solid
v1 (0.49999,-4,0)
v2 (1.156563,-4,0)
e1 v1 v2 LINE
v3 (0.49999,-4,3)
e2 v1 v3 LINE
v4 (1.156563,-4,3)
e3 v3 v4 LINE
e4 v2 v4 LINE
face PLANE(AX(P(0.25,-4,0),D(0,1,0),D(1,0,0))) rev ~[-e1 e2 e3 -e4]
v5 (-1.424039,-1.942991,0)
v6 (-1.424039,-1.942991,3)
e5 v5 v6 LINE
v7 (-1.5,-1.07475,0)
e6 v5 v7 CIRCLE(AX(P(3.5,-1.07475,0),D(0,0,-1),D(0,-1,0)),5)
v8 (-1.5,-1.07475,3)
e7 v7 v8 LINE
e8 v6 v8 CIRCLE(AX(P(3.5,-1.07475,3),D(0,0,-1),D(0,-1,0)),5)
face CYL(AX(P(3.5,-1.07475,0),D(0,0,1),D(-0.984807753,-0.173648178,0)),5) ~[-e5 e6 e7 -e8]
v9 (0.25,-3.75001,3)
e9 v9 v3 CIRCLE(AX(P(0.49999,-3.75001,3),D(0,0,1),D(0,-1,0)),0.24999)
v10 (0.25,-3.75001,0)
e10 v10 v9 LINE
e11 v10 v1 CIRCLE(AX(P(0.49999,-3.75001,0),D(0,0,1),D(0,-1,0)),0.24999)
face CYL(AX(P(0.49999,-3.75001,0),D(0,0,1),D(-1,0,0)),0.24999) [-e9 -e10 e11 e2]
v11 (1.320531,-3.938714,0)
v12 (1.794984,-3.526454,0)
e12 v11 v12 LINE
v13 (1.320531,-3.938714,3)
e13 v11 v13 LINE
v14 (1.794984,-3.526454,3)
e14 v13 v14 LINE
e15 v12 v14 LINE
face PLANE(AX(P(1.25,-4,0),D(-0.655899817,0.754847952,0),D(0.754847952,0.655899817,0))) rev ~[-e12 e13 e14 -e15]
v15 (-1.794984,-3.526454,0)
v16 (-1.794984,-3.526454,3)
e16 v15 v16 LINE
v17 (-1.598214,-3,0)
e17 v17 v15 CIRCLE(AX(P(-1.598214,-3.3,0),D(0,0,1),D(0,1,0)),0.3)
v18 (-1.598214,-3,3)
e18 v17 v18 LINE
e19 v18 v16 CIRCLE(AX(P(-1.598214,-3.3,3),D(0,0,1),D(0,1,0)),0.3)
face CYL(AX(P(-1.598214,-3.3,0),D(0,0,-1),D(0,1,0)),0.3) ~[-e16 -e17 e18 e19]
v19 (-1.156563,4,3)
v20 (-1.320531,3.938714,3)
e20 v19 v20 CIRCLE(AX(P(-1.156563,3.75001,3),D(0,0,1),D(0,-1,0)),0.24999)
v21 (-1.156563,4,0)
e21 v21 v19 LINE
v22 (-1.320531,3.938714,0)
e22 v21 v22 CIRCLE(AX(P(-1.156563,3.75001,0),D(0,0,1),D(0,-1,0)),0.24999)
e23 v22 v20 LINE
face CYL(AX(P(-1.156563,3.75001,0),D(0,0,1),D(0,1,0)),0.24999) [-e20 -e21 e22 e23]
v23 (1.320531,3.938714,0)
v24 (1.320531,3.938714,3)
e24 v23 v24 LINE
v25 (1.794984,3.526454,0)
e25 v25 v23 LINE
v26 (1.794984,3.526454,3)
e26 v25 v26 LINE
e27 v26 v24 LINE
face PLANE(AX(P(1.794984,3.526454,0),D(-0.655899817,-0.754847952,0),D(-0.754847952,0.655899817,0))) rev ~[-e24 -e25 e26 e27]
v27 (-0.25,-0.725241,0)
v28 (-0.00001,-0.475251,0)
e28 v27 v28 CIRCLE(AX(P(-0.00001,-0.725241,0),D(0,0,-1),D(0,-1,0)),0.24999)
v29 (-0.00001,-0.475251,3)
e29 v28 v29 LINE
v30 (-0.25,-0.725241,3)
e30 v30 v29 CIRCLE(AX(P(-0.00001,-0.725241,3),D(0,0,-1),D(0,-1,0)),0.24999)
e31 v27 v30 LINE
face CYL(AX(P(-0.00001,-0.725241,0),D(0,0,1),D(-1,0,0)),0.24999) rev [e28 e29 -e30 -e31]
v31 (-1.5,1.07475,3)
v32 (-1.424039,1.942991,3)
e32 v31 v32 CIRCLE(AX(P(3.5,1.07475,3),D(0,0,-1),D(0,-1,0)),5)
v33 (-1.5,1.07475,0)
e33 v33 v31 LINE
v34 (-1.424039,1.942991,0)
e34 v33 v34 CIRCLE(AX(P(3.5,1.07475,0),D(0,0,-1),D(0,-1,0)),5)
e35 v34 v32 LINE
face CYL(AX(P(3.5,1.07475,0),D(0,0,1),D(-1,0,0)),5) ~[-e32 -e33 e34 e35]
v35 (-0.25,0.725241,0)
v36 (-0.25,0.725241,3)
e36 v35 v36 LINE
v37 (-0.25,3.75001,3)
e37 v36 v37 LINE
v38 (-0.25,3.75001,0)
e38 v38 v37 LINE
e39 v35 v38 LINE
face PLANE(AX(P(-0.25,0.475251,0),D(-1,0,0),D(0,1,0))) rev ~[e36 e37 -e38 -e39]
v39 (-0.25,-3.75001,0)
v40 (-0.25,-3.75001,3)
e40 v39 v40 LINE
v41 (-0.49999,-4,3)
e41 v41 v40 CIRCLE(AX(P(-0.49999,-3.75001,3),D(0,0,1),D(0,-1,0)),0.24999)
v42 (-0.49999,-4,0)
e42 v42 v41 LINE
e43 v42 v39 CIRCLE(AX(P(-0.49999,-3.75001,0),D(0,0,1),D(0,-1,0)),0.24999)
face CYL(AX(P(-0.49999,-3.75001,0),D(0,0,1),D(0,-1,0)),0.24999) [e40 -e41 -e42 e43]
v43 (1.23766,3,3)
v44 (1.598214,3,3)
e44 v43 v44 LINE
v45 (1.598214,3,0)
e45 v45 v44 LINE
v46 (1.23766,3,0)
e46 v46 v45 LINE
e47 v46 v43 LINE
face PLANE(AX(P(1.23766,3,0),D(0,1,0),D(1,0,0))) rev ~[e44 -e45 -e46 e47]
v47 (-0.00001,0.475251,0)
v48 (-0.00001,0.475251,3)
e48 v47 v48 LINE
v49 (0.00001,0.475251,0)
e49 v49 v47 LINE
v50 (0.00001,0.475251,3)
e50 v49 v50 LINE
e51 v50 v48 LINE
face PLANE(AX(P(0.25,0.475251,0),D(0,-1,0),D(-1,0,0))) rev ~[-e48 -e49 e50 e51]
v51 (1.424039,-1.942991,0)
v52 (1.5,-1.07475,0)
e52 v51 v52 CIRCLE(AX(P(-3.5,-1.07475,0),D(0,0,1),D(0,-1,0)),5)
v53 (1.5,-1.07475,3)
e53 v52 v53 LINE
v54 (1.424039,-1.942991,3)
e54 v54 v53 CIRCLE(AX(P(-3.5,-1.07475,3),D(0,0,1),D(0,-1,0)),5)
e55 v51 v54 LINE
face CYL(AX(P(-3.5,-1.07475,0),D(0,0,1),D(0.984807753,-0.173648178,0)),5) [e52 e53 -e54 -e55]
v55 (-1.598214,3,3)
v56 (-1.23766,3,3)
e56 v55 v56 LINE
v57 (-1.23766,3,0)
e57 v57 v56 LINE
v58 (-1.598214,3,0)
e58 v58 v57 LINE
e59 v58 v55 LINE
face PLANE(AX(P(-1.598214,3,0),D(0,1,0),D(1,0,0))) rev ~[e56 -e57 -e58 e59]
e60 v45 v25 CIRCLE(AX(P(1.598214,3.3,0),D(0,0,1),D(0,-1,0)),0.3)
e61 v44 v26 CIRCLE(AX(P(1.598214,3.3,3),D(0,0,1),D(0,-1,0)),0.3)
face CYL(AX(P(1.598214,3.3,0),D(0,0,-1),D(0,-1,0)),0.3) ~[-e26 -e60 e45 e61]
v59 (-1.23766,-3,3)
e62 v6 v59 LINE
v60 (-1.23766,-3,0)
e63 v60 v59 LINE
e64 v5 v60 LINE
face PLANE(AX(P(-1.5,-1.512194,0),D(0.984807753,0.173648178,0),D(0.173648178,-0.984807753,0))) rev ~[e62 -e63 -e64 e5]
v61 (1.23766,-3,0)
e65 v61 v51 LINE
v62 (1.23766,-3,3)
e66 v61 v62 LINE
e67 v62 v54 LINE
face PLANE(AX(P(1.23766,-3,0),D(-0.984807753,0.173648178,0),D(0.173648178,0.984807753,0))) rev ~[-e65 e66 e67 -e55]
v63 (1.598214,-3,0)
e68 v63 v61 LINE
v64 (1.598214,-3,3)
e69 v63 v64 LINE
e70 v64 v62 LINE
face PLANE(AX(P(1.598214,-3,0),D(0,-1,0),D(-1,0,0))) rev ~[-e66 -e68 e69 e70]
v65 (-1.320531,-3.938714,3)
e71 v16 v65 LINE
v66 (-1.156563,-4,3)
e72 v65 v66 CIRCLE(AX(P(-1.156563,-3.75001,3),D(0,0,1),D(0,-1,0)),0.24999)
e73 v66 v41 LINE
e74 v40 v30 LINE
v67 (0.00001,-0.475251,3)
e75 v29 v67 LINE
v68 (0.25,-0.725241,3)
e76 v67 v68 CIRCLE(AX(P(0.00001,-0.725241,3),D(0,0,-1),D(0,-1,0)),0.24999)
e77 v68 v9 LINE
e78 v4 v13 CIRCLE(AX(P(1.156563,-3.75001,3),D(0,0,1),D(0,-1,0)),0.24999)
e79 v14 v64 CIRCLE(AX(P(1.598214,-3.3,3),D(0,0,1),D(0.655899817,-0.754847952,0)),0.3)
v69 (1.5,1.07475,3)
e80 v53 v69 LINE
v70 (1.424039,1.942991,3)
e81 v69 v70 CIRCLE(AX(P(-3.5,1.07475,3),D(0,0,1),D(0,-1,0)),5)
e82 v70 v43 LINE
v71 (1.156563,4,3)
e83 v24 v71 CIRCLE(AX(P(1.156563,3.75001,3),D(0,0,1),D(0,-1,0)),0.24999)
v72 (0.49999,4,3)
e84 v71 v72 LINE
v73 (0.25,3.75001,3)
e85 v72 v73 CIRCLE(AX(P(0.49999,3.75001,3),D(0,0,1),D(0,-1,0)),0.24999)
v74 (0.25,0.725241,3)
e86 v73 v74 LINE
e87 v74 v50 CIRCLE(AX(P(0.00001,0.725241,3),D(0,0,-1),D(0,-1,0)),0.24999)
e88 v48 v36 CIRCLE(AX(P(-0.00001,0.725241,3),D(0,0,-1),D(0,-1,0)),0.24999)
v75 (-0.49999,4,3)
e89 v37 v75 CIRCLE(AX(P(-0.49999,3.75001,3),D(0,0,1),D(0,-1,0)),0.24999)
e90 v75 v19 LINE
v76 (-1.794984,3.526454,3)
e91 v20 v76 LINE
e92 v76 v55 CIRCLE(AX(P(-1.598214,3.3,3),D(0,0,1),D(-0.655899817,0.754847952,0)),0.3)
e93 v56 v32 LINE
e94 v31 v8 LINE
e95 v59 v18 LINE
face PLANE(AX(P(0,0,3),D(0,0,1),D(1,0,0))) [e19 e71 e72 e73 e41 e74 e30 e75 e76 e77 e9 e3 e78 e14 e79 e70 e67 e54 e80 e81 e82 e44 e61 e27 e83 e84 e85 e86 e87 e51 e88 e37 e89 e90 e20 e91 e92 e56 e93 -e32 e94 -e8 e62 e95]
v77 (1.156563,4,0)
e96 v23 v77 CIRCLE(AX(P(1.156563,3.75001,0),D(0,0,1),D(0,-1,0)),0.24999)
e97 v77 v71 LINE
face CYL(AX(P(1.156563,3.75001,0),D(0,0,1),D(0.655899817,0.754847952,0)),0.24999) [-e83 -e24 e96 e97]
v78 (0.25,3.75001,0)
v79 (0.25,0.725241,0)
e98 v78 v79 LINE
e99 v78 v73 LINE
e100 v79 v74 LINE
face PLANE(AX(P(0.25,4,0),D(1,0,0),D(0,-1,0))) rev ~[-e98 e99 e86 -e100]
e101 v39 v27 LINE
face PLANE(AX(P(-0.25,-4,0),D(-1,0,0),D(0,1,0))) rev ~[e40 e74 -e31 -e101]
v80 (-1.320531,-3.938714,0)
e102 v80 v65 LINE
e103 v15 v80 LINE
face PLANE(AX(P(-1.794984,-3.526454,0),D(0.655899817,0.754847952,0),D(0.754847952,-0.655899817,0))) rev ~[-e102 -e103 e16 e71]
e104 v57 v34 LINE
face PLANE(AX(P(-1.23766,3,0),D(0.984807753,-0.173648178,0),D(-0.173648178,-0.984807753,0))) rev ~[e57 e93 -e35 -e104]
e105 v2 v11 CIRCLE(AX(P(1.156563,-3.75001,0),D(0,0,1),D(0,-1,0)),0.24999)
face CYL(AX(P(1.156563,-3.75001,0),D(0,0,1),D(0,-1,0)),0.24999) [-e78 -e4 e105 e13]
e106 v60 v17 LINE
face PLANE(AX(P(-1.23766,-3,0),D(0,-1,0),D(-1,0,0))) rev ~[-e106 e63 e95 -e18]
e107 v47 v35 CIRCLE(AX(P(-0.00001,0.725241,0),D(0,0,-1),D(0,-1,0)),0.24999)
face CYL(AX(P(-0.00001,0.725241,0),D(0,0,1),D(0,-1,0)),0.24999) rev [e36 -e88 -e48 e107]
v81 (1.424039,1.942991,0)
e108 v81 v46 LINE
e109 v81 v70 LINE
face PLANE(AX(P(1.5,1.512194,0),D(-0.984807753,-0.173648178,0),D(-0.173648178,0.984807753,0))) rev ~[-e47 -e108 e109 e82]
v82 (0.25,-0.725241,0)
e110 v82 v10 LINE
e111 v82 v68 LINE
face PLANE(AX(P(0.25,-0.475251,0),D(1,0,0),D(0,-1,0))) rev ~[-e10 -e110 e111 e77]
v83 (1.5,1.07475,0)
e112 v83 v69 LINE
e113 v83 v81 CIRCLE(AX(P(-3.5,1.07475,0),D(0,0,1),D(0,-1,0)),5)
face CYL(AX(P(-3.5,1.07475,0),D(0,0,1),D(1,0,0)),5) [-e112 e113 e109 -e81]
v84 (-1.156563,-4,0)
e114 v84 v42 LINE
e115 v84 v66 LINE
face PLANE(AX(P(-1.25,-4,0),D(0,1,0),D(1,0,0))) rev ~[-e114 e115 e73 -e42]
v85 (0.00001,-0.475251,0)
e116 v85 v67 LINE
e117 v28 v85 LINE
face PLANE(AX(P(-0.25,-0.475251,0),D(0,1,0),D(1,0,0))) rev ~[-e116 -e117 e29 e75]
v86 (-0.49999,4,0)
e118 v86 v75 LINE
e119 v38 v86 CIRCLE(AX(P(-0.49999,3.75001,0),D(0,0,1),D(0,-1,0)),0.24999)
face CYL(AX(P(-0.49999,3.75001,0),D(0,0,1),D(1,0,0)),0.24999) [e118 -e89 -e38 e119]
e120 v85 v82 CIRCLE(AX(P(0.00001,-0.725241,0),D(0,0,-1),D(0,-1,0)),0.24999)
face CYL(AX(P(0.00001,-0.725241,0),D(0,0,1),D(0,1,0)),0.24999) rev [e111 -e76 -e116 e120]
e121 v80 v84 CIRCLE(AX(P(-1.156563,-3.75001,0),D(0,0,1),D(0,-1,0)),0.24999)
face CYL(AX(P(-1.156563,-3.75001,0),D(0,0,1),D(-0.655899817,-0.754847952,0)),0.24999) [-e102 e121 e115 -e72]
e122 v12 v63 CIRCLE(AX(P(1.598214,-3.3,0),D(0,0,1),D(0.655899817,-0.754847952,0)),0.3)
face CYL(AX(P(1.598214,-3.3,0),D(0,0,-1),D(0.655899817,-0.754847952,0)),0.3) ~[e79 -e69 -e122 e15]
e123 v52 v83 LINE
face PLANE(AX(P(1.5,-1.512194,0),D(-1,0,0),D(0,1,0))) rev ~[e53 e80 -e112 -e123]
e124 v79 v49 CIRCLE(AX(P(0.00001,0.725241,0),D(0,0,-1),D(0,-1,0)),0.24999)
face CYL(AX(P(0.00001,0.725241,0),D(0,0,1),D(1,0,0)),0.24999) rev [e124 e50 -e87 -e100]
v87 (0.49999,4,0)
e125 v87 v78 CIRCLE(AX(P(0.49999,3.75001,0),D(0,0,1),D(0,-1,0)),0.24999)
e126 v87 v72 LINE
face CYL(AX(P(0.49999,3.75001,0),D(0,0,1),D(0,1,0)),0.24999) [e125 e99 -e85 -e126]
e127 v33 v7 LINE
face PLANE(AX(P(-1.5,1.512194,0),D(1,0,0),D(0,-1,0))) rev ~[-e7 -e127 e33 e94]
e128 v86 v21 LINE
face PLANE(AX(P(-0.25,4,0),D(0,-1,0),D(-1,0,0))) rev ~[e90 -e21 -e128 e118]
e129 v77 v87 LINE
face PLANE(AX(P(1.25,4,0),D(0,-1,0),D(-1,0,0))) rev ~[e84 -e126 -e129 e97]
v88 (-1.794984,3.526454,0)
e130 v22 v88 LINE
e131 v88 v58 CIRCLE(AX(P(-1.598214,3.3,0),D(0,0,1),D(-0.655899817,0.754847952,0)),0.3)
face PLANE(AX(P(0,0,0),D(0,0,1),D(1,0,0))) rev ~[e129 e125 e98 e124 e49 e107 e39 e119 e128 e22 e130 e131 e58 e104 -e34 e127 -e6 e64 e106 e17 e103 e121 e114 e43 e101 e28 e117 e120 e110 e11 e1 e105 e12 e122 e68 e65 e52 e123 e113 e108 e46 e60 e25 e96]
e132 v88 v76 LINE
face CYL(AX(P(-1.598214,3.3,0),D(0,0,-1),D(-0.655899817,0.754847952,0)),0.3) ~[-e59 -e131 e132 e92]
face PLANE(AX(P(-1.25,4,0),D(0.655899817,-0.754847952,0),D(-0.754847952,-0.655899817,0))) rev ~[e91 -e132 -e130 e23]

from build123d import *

# Parameters (mm, degrees)
F1_DEPTH = 3
F2_R     = 0.24999
F3_R     = 5


# Not quite as in the source:
# - a fillet or chamfer is up to 0.001 mm smaller than in the source, because OpenCascade refuses the exact size


with BuildPart() as f1:
    # F0 (on Top) → F1 (new body)
    with BuildSketch(Plane.XY):
        with BuildLine():
            Line((-1.5, 1.5121936516), (-1.5, 0))
            Line((-1.5, 0), (-1.5, -1.5121936516))
            Line((-1.5, -1.5121936516), (-1.2376595987, -3))
            Line((-1.2376595987, -3), (-1.5982141028, -3))
            ThreePointArc((-1.5982141028, -3), (-1.8792268389, -3.1949674233), (-1.7949840479, -3.5264543855))
            Line((-1.7949840479, -3.5264543855), (-1.25, -4))
            Line((-1.25, -4), (-0.25, -4))
            Line((-0.25, -4), (-0.25, -0.4752505826))
            Line((-0.25, -0.4752505826), (0, -0.4752505826))
            Line((0, -0.4752505826), (0.25, -0.4752505826))
            Line((0.25, -0.4752505826), (0.25, -4))
            Line((0.25, -4), (1.25, -4))
            Line((1.25, -4), (1.7949840479, -3.5264543855))
            ThreePointArc((1.7949840479, -3.5264543855), (1.8792268389, -3.1949674233), (1.5982141028, -3))
            Line((1.5982141028, -3), (1.2376595987, -3))
            Line((1.2376595987, -3), (1.5, -1.5121936516))
            Line((1.5, -1.5121936516), (1.5, 1.5121936516))
            Line((1.5, 1.5121936516), (1.2376595987, 3))
            Line((1.2376595987, 3), (1.5982141028, 3))
            ThreePointArc((1.5982141028, 3), (1.8792268389, 3.1949674233), (1.7949840479, 3.5264543855))
            Line((1.7949840479, 3.5264543855), (1.25, 4))
            Line((1.25, 4), (0.25, 4))
            Line((0.25, 4), (0.25, 0.4752505826))
            Line((0.25, 0.4752505826), (0, 0.4752505826))
            Line((0, 0.4752505826), (-0.25, 0.4752505826))
            Line((-0.25, 0.4752505826), (-0.25, 4))
            Line((-0.25, 4), (-1.25, 4))
            Line((-1.25, 4), (-1.7949840479, 3.5264543855))
            ThreePointArc((-1.7949840479, 3.5264543855), (-1.8792268389, 3.1949674233), (-1.5982141028, 3))
            Line((-1.5982141028, 3), (-1.2376595987, 3))
            Line((-1.2376595987, 3), (-1.5, 1.5121936516))
        make_face()
    extrude(amount=F1_DEPTH)

    # F2 (radius 0.25 in the source; OpenCascade refuses exactly that, so slightly less here)
    f2_edges = [f1.edges().sort_by_distance(p)[0] for p in [
        (-1.25, 4, 1.5),
        (-0.25, 4, 1.5),
        (0.25, 4, 1.5),
        (1.25, 4, 1.5),
        (-0.25, 0.475251, 1.5),
        (0.25, 0.475251, 1.5),
        (-0.25, -0.475251, 1.5),
        (0.25, -0.475251, 1.5),
        (-1.25, -4, 1.5),
        (-0.25, -4, 1.5),
        (0.25, -4, 1.5),
        (1.25, -4, 1.5),
    ]]
    fillet(f2_edges, radius=F2_R)

    # F3
    f3_edges = [f1.edges().sort_by_distance(p)[0] for p in [
        (-1.5, -1.512194, 1.5),
        (-1.5, 1.512194, 1.5),
        (1.5, -1.512194, 1.5),
        (1.5, 1.512194, 1.5),
    ]]
    fillet(f3_edges, radius=F3_R)


solid = f1.part
